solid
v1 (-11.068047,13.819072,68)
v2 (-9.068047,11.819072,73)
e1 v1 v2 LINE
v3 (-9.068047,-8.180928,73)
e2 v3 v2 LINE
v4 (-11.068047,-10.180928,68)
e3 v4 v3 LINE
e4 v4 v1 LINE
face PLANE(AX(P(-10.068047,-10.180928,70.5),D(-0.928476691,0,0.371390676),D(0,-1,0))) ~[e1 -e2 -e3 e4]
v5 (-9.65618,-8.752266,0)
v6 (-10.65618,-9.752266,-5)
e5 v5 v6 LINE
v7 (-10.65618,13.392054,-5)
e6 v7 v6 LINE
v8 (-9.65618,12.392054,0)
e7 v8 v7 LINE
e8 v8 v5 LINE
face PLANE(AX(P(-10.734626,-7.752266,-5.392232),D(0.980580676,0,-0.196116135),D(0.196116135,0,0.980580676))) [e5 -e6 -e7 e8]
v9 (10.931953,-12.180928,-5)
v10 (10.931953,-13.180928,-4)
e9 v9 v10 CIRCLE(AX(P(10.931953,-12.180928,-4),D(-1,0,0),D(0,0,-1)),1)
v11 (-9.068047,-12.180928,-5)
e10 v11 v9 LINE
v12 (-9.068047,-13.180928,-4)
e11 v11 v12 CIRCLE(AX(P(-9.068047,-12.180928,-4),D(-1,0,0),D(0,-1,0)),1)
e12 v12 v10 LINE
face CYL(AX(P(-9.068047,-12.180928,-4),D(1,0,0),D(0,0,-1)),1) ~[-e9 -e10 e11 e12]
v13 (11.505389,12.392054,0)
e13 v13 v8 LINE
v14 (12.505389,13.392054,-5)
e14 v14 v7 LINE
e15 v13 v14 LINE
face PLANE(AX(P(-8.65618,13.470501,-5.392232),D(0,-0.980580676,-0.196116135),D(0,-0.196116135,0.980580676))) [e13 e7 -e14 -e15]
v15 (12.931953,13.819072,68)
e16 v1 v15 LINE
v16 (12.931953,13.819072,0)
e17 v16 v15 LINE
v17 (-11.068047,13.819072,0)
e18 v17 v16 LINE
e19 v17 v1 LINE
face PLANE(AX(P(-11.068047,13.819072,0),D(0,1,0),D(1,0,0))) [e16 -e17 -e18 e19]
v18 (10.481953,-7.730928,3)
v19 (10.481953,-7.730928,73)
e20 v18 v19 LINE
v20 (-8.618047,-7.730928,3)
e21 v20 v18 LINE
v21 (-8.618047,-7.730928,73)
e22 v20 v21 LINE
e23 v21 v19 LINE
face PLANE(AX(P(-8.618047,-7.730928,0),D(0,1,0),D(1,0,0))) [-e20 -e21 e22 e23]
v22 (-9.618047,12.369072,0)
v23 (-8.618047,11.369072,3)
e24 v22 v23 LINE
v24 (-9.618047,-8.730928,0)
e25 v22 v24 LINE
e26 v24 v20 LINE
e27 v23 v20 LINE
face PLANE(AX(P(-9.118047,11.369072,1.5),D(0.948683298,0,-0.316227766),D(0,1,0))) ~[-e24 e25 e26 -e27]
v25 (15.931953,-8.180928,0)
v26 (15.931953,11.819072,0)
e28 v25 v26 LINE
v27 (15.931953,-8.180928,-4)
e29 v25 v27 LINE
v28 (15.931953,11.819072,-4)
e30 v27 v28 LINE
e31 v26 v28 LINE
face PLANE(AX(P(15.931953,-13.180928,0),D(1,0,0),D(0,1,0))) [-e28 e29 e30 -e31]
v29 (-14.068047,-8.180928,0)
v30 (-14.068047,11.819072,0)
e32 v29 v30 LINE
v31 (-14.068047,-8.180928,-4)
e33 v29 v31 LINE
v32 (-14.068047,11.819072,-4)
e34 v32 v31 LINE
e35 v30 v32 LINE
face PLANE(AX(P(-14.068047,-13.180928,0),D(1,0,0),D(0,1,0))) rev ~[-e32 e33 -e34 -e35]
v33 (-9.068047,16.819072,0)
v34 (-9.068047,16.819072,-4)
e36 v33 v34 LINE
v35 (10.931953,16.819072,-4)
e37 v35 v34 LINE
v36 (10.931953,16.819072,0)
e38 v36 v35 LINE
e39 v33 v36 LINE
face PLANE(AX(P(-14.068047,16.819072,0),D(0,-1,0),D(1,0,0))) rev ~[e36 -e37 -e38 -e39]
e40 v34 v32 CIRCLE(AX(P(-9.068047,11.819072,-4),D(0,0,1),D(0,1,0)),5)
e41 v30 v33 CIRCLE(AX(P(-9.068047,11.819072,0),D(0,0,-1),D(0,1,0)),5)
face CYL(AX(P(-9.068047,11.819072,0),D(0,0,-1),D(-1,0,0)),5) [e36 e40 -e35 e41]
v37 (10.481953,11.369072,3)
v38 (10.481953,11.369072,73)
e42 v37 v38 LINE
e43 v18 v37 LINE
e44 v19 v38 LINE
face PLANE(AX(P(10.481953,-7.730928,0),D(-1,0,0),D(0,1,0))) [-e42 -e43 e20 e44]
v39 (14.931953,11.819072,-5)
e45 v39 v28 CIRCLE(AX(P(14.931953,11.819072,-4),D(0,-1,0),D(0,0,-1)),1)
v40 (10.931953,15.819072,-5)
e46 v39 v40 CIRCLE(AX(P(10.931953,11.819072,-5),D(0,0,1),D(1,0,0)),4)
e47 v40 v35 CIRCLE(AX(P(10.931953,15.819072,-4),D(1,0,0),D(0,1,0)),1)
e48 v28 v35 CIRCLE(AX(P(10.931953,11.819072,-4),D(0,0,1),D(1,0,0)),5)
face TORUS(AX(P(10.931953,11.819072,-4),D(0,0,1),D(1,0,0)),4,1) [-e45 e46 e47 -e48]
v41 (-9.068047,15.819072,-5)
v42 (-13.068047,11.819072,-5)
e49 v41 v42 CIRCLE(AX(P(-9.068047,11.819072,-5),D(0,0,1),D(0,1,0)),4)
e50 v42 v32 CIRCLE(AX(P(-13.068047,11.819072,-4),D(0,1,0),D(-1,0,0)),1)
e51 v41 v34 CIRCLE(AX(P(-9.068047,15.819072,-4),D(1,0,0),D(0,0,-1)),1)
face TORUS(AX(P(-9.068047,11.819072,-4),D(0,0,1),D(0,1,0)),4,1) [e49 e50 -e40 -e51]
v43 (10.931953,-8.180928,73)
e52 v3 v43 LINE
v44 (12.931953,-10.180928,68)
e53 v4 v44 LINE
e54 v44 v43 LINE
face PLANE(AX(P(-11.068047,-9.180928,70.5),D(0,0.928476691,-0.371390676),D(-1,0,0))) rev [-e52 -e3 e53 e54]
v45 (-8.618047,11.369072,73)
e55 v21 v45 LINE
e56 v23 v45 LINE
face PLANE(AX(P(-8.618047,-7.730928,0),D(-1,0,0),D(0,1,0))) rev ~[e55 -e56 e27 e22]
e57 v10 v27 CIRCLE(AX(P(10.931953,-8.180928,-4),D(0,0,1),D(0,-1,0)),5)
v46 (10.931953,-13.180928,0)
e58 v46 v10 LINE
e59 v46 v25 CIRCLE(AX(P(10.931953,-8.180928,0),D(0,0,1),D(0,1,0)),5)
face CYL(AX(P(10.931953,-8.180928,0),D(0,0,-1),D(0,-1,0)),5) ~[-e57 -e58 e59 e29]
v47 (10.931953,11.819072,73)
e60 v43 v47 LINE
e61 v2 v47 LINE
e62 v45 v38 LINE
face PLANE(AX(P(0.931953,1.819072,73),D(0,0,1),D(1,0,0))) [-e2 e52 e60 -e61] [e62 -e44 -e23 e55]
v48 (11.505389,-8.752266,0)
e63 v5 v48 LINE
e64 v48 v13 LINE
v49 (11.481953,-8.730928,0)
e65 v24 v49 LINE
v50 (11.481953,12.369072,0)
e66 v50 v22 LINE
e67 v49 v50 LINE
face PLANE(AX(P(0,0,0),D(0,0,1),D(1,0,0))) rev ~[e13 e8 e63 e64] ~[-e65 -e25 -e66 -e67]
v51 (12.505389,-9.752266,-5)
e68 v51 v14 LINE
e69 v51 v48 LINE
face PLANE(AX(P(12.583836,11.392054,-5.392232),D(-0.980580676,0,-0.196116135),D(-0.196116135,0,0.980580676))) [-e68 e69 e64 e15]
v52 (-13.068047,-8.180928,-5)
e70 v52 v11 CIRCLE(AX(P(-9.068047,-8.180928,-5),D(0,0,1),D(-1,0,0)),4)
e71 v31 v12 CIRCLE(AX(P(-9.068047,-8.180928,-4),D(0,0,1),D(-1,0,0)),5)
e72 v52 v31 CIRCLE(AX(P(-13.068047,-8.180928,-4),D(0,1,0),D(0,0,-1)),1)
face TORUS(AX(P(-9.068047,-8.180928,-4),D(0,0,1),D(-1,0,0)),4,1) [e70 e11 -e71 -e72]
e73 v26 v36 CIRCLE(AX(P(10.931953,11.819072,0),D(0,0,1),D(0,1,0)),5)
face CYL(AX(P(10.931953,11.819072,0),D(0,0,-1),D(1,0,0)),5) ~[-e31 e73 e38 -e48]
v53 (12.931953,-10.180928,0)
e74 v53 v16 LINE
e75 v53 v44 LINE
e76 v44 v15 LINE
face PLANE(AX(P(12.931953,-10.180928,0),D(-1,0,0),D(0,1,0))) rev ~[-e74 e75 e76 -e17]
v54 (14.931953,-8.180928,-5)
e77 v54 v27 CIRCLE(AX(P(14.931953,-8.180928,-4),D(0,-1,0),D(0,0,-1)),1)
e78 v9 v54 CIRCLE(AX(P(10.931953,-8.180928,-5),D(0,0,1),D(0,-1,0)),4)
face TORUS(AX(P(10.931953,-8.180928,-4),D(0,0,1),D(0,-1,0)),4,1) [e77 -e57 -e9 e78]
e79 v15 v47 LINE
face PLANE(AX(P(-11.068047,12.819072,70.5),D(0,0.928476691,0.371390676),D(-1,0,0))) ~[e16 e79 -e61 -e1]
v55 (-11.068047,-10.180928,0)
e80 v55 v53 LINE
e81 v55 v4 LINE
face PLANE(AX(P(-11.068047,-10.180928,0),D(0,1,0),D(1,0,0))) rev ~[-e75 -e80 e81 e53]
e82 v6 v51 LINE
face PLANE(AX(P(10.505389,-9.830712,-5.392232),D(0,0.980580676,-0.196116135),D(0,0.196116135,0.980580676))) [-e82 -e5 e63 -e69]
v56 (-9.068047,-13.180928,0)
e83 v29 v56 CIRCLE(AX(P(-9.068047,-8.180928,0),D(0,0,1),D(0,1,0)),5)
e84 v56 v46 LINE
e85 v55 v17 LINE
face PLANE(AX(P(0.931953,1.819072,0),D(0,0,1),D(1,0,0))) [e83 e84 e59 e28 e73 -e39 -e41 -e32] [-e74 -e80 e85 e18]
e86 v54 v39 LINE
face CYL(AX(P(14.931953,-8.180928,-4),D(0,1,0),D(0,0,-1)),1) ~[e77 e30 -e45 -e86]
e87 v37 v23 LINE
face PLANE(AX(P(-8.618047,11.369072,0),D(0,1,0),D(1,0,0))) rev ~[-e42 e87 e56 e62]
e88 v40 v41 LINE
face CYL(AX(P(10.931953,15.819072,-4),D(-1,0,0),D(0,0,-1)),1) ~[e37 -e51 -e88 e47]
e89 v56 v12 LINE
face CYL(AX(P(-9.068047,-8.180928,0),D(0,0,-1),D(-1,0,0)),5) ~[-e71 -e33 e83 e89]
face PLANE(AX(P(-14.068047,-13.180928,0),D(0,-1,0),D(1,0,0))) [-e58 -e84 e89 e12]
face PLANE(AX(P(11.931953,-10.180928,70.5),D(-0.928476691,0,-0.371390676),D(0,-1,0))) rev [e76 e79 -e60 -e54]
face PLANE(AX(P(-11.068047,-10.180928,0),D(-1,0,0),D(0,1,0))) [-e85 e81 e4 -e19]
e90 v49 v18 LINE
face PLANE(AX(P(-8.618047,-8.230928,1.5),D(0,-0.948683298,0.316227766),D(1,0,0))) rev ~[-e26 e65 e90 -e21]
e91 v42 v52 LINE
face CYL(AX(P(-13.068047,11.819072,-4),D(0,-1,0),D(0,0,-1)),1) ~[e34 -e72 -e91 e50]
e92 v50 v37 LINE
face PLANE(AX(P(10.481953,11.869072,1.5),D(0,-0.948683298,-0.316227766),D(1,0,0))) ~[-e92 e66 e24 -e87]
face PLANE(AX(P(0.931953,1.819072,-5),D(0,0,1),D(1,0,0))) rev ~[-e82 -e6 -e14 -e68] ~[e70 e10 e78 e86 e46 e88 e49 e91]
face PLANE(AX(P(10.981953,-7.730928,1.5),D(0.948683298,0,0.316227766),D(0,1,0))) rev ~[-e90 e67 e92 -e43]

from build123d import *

# Parameters (mm, degrees)
F0_W         = 24
F0_H         = 24
F0_W_2       = 19.1
F0_H_2       = 19.1
F1_DEPTH     = 73
F2_W         = 30
F2_H         = 30
F2_W_2       = 19.1615689546
F2_H_2       = 19.1443199292
F3_DEPTH     = 5
F4_T4_DEPTH  = 19.1615689546
F4_T9_DEPTH  = 19.1443199292
F4_T14_DEPTH = 19.1615689546
F4_T19_DEPTH = 19.1443199292
F4_T25_DEPTH = 45.1428898176
F4_T30_DEPTH = 45.1256407922
F4_T38_DEPTH = 45.1428898176
F4_T43_DEPTH = 45.1256407922
F4_T51_DEPTH = 45.1428898176
F4_T56_DEPTH = 45.1256407922
F4_T64_DEPTH = 45.1256407922
F4_T69_DEPTH = 45.1428898176
F5_SIZE2     = 3
F5_SIZE      = 1
F6_R         = 5
F7_R         = 1
F8_SIZE2     = 2
F8_SIZE      = 5


# Not quite as in the source:
# - a fillet or chamfer that OpenCascade refuses, or shapes differently, is made with other operations: its cross-section is extruded or revolved along the edge and cut away or added


with BuildPart() as f1:
    # F0 (on Top) → F1 (new body)
    with BuildSketch(Plane.XY):
        with Locations((0.93195308, 1.8190721235)):
            Rectangle(F0_W, F0_H)
        with Locations((0.93195308, 1.8190721235)):
            Rectangle(F0_W_2, F0_H_2, mode=Mode.SUBTRACT)
    extrude(amount=F1_DEPTH)

    # F2 (on Top) → F3 (join)
    with BuildSketch(Plane.XY):
        with Locations((0.93195308, 1.8190721235)):
            Rectangle(F2_W, F2_H)
        with Locations((0.9246049449, 1.8198941834)):
            Rectangle(F2_W_2, F2_H_2, mode=Mode.SUBTRACT)
    extrude(amount=-F3_DEPTH)

    # F4: chamfer of 2 x 10 on 4 edges, made by hand


with BuildPart() as f4_tool2:
    # F4_s3 → F4_t4 (new body)
    with BuildSketch(Plane.YZ.offset(10.5053894222)):
        with BuildLine():
            Line((-9.8307122352, -5.3922322703), (-7.6738193271, 5.3922322703))
            Line((-7.6738193271, 5.3922322703), (-7.4738193271, 5.3922322703))
            ThreePointArc((-7.4738193271, 5.3922322703), (-7.5522657812, 0.1961161351), (-7.5522657812, -5))
            Line((-7.5522657812, -5), (-7.7522657812, -5.2))
            ThreePointArc((-7.7522657812, -5.2), (-8.7914890082, -5.2), (-9.8307122352, -5.5922322703))
            Line((-9.8307122352, -5.5922322703), (-9.8307122352, -5.3922322703))
        make_face()
    extrude(amount=-F4_T4_DEPTH)

    split(bisect_by=Plane.XY, keep=Keep.BOTTOM)


with BuildPart() as f1_1:
    add(f1.part)

    # F4_t1: cut F4_tool2
    add(f4_tool2.part, mode=Mode.SUBTRACT)


with BuildPart() as f4_tool7:
    # F4_s8 → F4_t9 (new body)
    with BuildSketch(Plane.XZ.offset(-11.392054148)):
        with BuildLine():
            Line((12.5838358762, -5.3922322703), (10.4269429681, 5.3922322703))
            Line((10.4269429681, 5.3922322703), (10.2269429681, 5.3922322703))
            ThreePointArc((10.2269429681, 5.3922322703), (10.3053894222, 0.1961161351), (10.3053894222, -5))
            Line((10.3053894222, -5), (10.5053894222, -5.2))
            ThreePointArc((10.5053894222, -5.2), (11.5446126492, -5.2), (12.5838358762, -5.5922322703))
            Line((12.5838358762, -5.5922322703), (12.5838358762, -5.3922322703))
        make_face()
    extrude(amount=F4_T9_DEPTH)

    split(bisect_by=Plane.XY, keep=Keep.BOTTOM)


with BuildPart() as f1_2:
    add(f1_1.part)

    # F4_t6: cut F4_tool7
    add(f4_tool7.part, mode=Mode.SUBTRACT)


with BuildPart() as f4_tool12:
    # F4_s13 → F4_t14 (new body)
    with BuildSketch(Plane.YZ.offset(-8.6561795324)):
        with BuildLine():
            Line((13.4705006021, -5.3922322703), (11.313607694, 5.3922322703))
            Line((11.313607694, 5.3922322703), (11.113607694, 5.3922322703))
            ThreePointArc((11.113607694, 5.3922322703), (11.192054148, 0.1961161351), (11.192054148, -5))
            Line((11.192054148, -5), (11.392054148, -5.2))
            ThreePointArc((11.392054148, -5.2), (12.431277375, -5.2), (13.4705006021, -5.5922322703))
            Line((13.4705006021, -5.5922322703), (13.4705006021, -5.3922322703))
        make_face()
    extrude(amount=F4_T14_DEPTH)

    split(bisect_by=Plane.XY, keep=Keep.BOTTOM)


with BuildPart() as f1_3:
    add(f1_2.part)

    # F4_t11: cut F4_tool12
    add(f4_tool12.part, mode=Mode.SUBTRACT)


with BuildPart() as f4_tool17:
    # F4_s18 → F4_t19 (new body)
    with BuildSketch(Plane.XZ.offset(7.7522657812)):
        with BuildLine():
            Line((-10.7346259865, -5.3922322703), (-8.5777330784, 5.3922322703))
            Line((-8.5777330784, 5.3922322703), (-8.3777330784, 5.3922322703))
            ThreePointArc((-8.3777330784, 5.3922322703), (-8.4561795324, 0.1961161351), (-8.4561795324, -5))
            Line((-8.4561795324, -5), (-8.6561795324, -5.2))
            ThreePointArc((-8.6561795324, -5.2), (-9.6954027594, -5.2), (-10.7346259865, -5.5922322703))
            Line((-10.7346259865, -5.5922322703), (-10.7346259865, -5.3922322703))
        make_face()
    extrude(amount=-F4_T19_DEPTH)

    split(bisect_by=Plane.XY, keep=Keep.BOTTOM)


with BuildPart() as f1_4:
    add(f1_3.part)

    # F4_t16: cut F4_tool17
    add(f4_tool17.part, mode=Mode.SUBTRACT)


with BuildPart() as f4_tool23:
    # F4_s24 → F4_t25 (new body)
    with BuildSketch(Plane.YZ.offset(36.4867102851)):
        with BuildLine():
            Line((-9.8307122352, -5.3922322703), (-7.6738193271, 5.3922322703))
            Line((-7.6738193271, 5.3922322703), (-7.4738193271, 5.3922322703))
            ThreePointArc((-7.4738193271, 5.3922322703), (-7.5522657812, 0.1961161351), (-7.5522657812, -5))
            Line((-7.5522657812, -5), (-7.7522657812, -5.2))
            ThreePointArc((-7.7522657812, -5.2), (-8.7914890082, -5.2), (-9.8307122352, -5.5922322703))
            Line((-9.8307122352, -5.5922322703), (-9.8307122352, -5.3922322703))
        make_face()
    extrude(amount=-F4_T25_DEPTH)

    split(bisect_by=Plane.XY, keep=Keep.BOTTOM)

    split(bisect_by=Plane.YZ.offset(10.5053894222), keep=Keep.TOP)


with BuildPart() as f4_tool28:
    # F4_s29 → F4_t30 (new body)
    with BuildSketch(Plane.XZ.offset(-11.392054148)):
        with BuildLine():
            Line((12.5838358762, -5.3922322703), (10.4269429681, 5.3922322703))
            Line((10.4269429681, 5.3922322703), (10.2269429681, 5.3922322703))
            ThreePointArc((10.2269429681, 5.3922322703), (10.3053894222, 0.1961161351), (10.3053894222, -5))
            Line((10.3053894222, -5), (10.5053894222, -5.2))
            ThreePointArc((10.5053894222, -5.2), (11.5446126492, -5.2), (12.5838358762, -5.5922322703))
            Line((12.5838358762, -5.5922322703), (12.5838358762, -5.3922322703))
        make_face()
    extrude(amount=F4_T30_DEPTH)

    split(bisect_by=Plane.XY, keep=Keep.BOTTOM)

    split(bisect_by=Plane.XZ.offset(7.7522657812), keep=Keep.TOP)


with BuildPart() as f4_tool23_1:
    add(f4_tool23.part)

    # F4_t33: intersect F4_tool28
    add(f4_tool28.part, mode=Mode.INTERSECT)


with BuildPart() as f1_5:
    add(f1_4.part)

    # F4_t21: cut F4_tool23
    add(f4_tool23_1.part, mode=Mode.SUBTRACT)


with BuildPart() as f4_tool36:
    # F4_s37 → F4_t38 (new body)
    with BuildSketch(Plane.YZ.offset(10.5053894222)):
        with BuildLine():
            Line((-9.8307122352, -5.3922322703), (-7.6738193271, 5.3922322703))
            Line((-7.6738193271, 5.3922322703), (-7.4738193271, 5.3922322703))
            ThreePointArc((-7.4738193271, 5.3922322703), (-7.5522657812, 0.1961161351), (-7.5522657812, -5))
            Line((-7.5522657812, -5), (-7.7522657812, -5.2))
            ThreePointArc((-7.7522657812, -5.2), (-8.7914890082, -5.2), (-9.8307122352, -5.5922322703))
            Line((-9.8307122352, -5.5922322703), (-9.8307122352, -5.3922322703))
        make_face()
    extrude(amount=-F4_T38_DEPTH)

    split(bisect_by=Plane.XY, keep=Keep.BOTTOM)

    split(bisect_by=Plane.YZ.offset(-8.6561795324), keep=Keep.BOTTOM)


with BuildPart() as f4_tool41:
    # F4_s42 → F4_t43 (new body)
    with BuildSketch(Plane.XZ.offset(33.7335866441)):
        with BuildLine():
            Line((-10.7346259865, -5.3922322703), (-8.5777330784, 5.3922322703))
            Line((-8.5777330784, 5.3922322703), (-8.3777330784, 5.3922322703))
            ThreePointArc((-8.3777330784, 5.3922322703), (-8.4561795324, 0.1961161351), (-8.4561795324, -5))
            Line((-8.4561795324, -5), (-8.6561795324, -5.2))
            ThreePointArc((-8.6561795324, -5.2), (-9.6954027594, -5.2), (-10.7346259865, -5.5922322703))
            Line((-10.7346259865, -5.5922322703), (-10.7346259865, -5.3922322703))
        make_face()
    extrude(amount=-F4_T43_DEPTH)

    split(bisect_by=Plane.XY, keep=Keep.BOTTOM)

    split(bisect_by=Plane.XZ.offset(7.7522657812), keep=Keep.TOP)


with BuildPart() as f4_tool36_1:
    add(f4_tool36.part)

    # F4_t46: intersect F4_tool41
    add(f4_tool41.part, mode=Mode.INTERSECT)


with BuildPart() as f1_6:
    add(f1_5.part)

    # F4_t34: cut F4_tool36
    add(f4_tool36_1.part, mode=Mode.SUBTRACT)


with BuildPart() as f4_tool49:
    # F4_s50 → F4_t51 (new body)
    with BuildSketch(Plane.YZ.offset(-8.6561795324)):
        with BuildLine():
            Line((13.4705006021, -5.3922322703), (11.313607694, 5.3922322703))
            Line((11.313607694, 5.3922322703), (11.113607694, 5.3922322703))
            ThreePointArc((11.113607694, 5.3922322703), (11.192054148, 0.1961161351), (11.192054148, -5))
            Line((11.192054148, -5), (11.392054148, -5.2))
            ThreePointArc((11.392054148, -5.2), (12.431277375, -5.2), (13.4705006021, -5.5922322703))
            Line((13.4705006021, -5.5922322703), (13.4705006021, -5.3922322703))
        make_face()
    extrude(amount=F4_T51_DEPTH)

    split(bisect_by=Plane.XY, keep=Keep.BOTTOM)

    split(bisect_by=Plane.YZ.offset(10.5053894222), keep=Keep.TOP)


with BuildPart() as f4_tool54:
    # F4_s55 → F4_t56 (new body)
    with BuildSketch(Plane.XZ.offset(-37.373375011)):
        with BuildLine():
            Line((12.5838358762, -5.3922322703), (10.4269429681, 5.3922322703))
            Line((10.4269429681, 5.3922322703), (10.2269429681, 5.3922322703))
            ThreePointArc((10.2269429681, 5.3922322703), (10.3053894222, 0.1961161351), (10.3053894222, -5))
            Line((10.3053894222, -5), (10.5053894222, -5.2))
            ThreePointArc((10.5053894222, -5.2), (11.5446126492, -5.2), (12.5838358762, -5.5922322703))
            Line((12.5838358762, -5.5922322703), (12.5838358762, -5.3922322703))
        make_face()
    extrude(amount=F4_T56_DEPTH)

    split(bisect_by=Plane.XY, keep=Keep.BOTTOM)

    split(bisect_by=Plane.XZ.offset(-11.392054148), keep=Keep.BOTTOM)


with BuildPart() as f4_tool49_1:
    add(f4_tool49.part)

    # F4_t59: intersect F4_tool54
    add(f4_tool54.part, mode=Mode.INTERSECT)


with BuildPart() as f1_7:
    add(f1_6.part)

    # F4_t47: cut F4_tool49
    add(f4_tool49_1.part, mode=Mode.SUBTRACT)


with BuildPart() as f4_tool62:
    # F4_s63 → F4_t64 (new body)
    with BuildSketch(Plane.XZ.offset(7.7522657812)):
        with BuildLine():
            Line((-10.7346259865, -5.3922322703), (-8.5777330784, 5.3922322703))
            Line((-8.5777330784, 5.3922322703), (-8.3777330784, 5.3922322703))
            ThreePointArc((-8.3777330784, 5.3922322703), (-8.4561795324, 0.1961161351), (-8.4561795324, -5))
            Line((-8.4561795324, -5), (-8.6561795324, -5.2))
            ThreePointArc((-8.6561795324, -5.2), (-9.6954027594, -5.2), (-10.7346259865, -5.5922322703))
            Line((-10.7346259865, -5.5922322703), (-10.7346259865, -5.3922322703))
        make_face()
    extrude(amount=-F4_T64_DEPTH)

    split(bisect_by=Plane.XY, keep=Keep.BOTTOM)

    split(bisect_by=Plane.XZ.offset(-11.392054148), keep=Keep.BOTTOM)


with BuildPart() as f4_tool67:
    # F4_s68 → F4_t69 (new body)
    with BuildSketch(Plane.YZ.offset(-34.6375003954)):
        with BuildLine():
            Line((13.4705006021, -5.3922322703), (11.313607694, 5.3922322703))
            Line((11.313607694, 5.3922322703), (11.113607694, 5.3922322703))
            ThreePointArc((11.113607694, 5.3922322703), (11.192054148, 0.1961161351), (11.192054148, -5))
            Line((11.192054148, -5), (11.392054148, -5.2))
            ThreePointArc((11.392054148, -5.2), (12.431277375, -5.2), (13.4705006021, -5.5922322703))
            Line((13.4705006021, -5.5922322703), (13.4705006021, -5.3922322703))
        make_face()
    extrude(amount=F4_T69_DEPTH)

    split(bisect_by=Plane.XY, keep=Keep.BOTTOM)

    split(bisect_by=Plane.YZ.offset(-8.6561795324), keep=Keep.BOTTOM)


with BuildPart() as f4_tool62_1:
    add(f4_tool62.part)

    # F4_t72: intersect F4_tool67
    add(f4_tool67.part, mode=Mode.INTERSECT)


with BuildPart() as f1_8:
    add(f1_7.part)

    # F4_t60: cut F4_tool62
    add(f4_tool62_1.part, mode=Mode.SUBTRACT)

    # F5
    f5_edges = [f1_8.edges().sort_by_distance(p)[0] for p in [
        (0.931953, -7.730928, 0),
        (10.481953, 1.819072, 0),
        (0.931953, 11.369072, 0),
        (-8.618047, 1.819072, 0),
    ]]
    f5_side = f1_8.faces().sort_by_distance((0.931953, 11.66822, 0))[0]
    chamfer(f5_edges, length=F5_SIZE, length2=F5_SIZE2, reference=f5_side)

    # F6
    f6_edges = [f1_8.edges().sort_by_distance(p)[0] for p in [
        (-14.068047, 16.819072, -2.5),
        (15.931953, 16.819072, -2.5),
        (15.931953, -13.180928, -2.5),
        (-14.068047, -13.180928, -2.5),
    ]]
    fillet(f6_edges, radius=F6_R)

    # F7
    f7_edges = [f1_8.edges().sort_by_distance(p)[0] for p in [
        (15.931953, 1.819072, -5),
        (14.467487, -11.716462, -5),
        (0.931953, -13.180928, -5),
        (-14.068047, 1.819072, -5),
        (-12.603581, 15.354606, -5),
        (-12.603581, -11.716462, -5),
        (0.931953, 16.819072, -5),
        (14.467487, 15.354606, -5),
    ]]
    fillet(f7_edges, radius=F7_R)

    # F8
    f8_edges = [f1_8.edges().sort_by_distance(p)[0] for p in [
        (0.931953, 13.819072, 73),
        (12.931953, 1.819072, 73),
        (0.931953, -10.180928, 73),
        (-11.068047, 1.819072, 73),
    ]]
    chamfer(f8_edges, length=F8_SIZE, length2=F8_SIZE2)


solid = f1_8.part
